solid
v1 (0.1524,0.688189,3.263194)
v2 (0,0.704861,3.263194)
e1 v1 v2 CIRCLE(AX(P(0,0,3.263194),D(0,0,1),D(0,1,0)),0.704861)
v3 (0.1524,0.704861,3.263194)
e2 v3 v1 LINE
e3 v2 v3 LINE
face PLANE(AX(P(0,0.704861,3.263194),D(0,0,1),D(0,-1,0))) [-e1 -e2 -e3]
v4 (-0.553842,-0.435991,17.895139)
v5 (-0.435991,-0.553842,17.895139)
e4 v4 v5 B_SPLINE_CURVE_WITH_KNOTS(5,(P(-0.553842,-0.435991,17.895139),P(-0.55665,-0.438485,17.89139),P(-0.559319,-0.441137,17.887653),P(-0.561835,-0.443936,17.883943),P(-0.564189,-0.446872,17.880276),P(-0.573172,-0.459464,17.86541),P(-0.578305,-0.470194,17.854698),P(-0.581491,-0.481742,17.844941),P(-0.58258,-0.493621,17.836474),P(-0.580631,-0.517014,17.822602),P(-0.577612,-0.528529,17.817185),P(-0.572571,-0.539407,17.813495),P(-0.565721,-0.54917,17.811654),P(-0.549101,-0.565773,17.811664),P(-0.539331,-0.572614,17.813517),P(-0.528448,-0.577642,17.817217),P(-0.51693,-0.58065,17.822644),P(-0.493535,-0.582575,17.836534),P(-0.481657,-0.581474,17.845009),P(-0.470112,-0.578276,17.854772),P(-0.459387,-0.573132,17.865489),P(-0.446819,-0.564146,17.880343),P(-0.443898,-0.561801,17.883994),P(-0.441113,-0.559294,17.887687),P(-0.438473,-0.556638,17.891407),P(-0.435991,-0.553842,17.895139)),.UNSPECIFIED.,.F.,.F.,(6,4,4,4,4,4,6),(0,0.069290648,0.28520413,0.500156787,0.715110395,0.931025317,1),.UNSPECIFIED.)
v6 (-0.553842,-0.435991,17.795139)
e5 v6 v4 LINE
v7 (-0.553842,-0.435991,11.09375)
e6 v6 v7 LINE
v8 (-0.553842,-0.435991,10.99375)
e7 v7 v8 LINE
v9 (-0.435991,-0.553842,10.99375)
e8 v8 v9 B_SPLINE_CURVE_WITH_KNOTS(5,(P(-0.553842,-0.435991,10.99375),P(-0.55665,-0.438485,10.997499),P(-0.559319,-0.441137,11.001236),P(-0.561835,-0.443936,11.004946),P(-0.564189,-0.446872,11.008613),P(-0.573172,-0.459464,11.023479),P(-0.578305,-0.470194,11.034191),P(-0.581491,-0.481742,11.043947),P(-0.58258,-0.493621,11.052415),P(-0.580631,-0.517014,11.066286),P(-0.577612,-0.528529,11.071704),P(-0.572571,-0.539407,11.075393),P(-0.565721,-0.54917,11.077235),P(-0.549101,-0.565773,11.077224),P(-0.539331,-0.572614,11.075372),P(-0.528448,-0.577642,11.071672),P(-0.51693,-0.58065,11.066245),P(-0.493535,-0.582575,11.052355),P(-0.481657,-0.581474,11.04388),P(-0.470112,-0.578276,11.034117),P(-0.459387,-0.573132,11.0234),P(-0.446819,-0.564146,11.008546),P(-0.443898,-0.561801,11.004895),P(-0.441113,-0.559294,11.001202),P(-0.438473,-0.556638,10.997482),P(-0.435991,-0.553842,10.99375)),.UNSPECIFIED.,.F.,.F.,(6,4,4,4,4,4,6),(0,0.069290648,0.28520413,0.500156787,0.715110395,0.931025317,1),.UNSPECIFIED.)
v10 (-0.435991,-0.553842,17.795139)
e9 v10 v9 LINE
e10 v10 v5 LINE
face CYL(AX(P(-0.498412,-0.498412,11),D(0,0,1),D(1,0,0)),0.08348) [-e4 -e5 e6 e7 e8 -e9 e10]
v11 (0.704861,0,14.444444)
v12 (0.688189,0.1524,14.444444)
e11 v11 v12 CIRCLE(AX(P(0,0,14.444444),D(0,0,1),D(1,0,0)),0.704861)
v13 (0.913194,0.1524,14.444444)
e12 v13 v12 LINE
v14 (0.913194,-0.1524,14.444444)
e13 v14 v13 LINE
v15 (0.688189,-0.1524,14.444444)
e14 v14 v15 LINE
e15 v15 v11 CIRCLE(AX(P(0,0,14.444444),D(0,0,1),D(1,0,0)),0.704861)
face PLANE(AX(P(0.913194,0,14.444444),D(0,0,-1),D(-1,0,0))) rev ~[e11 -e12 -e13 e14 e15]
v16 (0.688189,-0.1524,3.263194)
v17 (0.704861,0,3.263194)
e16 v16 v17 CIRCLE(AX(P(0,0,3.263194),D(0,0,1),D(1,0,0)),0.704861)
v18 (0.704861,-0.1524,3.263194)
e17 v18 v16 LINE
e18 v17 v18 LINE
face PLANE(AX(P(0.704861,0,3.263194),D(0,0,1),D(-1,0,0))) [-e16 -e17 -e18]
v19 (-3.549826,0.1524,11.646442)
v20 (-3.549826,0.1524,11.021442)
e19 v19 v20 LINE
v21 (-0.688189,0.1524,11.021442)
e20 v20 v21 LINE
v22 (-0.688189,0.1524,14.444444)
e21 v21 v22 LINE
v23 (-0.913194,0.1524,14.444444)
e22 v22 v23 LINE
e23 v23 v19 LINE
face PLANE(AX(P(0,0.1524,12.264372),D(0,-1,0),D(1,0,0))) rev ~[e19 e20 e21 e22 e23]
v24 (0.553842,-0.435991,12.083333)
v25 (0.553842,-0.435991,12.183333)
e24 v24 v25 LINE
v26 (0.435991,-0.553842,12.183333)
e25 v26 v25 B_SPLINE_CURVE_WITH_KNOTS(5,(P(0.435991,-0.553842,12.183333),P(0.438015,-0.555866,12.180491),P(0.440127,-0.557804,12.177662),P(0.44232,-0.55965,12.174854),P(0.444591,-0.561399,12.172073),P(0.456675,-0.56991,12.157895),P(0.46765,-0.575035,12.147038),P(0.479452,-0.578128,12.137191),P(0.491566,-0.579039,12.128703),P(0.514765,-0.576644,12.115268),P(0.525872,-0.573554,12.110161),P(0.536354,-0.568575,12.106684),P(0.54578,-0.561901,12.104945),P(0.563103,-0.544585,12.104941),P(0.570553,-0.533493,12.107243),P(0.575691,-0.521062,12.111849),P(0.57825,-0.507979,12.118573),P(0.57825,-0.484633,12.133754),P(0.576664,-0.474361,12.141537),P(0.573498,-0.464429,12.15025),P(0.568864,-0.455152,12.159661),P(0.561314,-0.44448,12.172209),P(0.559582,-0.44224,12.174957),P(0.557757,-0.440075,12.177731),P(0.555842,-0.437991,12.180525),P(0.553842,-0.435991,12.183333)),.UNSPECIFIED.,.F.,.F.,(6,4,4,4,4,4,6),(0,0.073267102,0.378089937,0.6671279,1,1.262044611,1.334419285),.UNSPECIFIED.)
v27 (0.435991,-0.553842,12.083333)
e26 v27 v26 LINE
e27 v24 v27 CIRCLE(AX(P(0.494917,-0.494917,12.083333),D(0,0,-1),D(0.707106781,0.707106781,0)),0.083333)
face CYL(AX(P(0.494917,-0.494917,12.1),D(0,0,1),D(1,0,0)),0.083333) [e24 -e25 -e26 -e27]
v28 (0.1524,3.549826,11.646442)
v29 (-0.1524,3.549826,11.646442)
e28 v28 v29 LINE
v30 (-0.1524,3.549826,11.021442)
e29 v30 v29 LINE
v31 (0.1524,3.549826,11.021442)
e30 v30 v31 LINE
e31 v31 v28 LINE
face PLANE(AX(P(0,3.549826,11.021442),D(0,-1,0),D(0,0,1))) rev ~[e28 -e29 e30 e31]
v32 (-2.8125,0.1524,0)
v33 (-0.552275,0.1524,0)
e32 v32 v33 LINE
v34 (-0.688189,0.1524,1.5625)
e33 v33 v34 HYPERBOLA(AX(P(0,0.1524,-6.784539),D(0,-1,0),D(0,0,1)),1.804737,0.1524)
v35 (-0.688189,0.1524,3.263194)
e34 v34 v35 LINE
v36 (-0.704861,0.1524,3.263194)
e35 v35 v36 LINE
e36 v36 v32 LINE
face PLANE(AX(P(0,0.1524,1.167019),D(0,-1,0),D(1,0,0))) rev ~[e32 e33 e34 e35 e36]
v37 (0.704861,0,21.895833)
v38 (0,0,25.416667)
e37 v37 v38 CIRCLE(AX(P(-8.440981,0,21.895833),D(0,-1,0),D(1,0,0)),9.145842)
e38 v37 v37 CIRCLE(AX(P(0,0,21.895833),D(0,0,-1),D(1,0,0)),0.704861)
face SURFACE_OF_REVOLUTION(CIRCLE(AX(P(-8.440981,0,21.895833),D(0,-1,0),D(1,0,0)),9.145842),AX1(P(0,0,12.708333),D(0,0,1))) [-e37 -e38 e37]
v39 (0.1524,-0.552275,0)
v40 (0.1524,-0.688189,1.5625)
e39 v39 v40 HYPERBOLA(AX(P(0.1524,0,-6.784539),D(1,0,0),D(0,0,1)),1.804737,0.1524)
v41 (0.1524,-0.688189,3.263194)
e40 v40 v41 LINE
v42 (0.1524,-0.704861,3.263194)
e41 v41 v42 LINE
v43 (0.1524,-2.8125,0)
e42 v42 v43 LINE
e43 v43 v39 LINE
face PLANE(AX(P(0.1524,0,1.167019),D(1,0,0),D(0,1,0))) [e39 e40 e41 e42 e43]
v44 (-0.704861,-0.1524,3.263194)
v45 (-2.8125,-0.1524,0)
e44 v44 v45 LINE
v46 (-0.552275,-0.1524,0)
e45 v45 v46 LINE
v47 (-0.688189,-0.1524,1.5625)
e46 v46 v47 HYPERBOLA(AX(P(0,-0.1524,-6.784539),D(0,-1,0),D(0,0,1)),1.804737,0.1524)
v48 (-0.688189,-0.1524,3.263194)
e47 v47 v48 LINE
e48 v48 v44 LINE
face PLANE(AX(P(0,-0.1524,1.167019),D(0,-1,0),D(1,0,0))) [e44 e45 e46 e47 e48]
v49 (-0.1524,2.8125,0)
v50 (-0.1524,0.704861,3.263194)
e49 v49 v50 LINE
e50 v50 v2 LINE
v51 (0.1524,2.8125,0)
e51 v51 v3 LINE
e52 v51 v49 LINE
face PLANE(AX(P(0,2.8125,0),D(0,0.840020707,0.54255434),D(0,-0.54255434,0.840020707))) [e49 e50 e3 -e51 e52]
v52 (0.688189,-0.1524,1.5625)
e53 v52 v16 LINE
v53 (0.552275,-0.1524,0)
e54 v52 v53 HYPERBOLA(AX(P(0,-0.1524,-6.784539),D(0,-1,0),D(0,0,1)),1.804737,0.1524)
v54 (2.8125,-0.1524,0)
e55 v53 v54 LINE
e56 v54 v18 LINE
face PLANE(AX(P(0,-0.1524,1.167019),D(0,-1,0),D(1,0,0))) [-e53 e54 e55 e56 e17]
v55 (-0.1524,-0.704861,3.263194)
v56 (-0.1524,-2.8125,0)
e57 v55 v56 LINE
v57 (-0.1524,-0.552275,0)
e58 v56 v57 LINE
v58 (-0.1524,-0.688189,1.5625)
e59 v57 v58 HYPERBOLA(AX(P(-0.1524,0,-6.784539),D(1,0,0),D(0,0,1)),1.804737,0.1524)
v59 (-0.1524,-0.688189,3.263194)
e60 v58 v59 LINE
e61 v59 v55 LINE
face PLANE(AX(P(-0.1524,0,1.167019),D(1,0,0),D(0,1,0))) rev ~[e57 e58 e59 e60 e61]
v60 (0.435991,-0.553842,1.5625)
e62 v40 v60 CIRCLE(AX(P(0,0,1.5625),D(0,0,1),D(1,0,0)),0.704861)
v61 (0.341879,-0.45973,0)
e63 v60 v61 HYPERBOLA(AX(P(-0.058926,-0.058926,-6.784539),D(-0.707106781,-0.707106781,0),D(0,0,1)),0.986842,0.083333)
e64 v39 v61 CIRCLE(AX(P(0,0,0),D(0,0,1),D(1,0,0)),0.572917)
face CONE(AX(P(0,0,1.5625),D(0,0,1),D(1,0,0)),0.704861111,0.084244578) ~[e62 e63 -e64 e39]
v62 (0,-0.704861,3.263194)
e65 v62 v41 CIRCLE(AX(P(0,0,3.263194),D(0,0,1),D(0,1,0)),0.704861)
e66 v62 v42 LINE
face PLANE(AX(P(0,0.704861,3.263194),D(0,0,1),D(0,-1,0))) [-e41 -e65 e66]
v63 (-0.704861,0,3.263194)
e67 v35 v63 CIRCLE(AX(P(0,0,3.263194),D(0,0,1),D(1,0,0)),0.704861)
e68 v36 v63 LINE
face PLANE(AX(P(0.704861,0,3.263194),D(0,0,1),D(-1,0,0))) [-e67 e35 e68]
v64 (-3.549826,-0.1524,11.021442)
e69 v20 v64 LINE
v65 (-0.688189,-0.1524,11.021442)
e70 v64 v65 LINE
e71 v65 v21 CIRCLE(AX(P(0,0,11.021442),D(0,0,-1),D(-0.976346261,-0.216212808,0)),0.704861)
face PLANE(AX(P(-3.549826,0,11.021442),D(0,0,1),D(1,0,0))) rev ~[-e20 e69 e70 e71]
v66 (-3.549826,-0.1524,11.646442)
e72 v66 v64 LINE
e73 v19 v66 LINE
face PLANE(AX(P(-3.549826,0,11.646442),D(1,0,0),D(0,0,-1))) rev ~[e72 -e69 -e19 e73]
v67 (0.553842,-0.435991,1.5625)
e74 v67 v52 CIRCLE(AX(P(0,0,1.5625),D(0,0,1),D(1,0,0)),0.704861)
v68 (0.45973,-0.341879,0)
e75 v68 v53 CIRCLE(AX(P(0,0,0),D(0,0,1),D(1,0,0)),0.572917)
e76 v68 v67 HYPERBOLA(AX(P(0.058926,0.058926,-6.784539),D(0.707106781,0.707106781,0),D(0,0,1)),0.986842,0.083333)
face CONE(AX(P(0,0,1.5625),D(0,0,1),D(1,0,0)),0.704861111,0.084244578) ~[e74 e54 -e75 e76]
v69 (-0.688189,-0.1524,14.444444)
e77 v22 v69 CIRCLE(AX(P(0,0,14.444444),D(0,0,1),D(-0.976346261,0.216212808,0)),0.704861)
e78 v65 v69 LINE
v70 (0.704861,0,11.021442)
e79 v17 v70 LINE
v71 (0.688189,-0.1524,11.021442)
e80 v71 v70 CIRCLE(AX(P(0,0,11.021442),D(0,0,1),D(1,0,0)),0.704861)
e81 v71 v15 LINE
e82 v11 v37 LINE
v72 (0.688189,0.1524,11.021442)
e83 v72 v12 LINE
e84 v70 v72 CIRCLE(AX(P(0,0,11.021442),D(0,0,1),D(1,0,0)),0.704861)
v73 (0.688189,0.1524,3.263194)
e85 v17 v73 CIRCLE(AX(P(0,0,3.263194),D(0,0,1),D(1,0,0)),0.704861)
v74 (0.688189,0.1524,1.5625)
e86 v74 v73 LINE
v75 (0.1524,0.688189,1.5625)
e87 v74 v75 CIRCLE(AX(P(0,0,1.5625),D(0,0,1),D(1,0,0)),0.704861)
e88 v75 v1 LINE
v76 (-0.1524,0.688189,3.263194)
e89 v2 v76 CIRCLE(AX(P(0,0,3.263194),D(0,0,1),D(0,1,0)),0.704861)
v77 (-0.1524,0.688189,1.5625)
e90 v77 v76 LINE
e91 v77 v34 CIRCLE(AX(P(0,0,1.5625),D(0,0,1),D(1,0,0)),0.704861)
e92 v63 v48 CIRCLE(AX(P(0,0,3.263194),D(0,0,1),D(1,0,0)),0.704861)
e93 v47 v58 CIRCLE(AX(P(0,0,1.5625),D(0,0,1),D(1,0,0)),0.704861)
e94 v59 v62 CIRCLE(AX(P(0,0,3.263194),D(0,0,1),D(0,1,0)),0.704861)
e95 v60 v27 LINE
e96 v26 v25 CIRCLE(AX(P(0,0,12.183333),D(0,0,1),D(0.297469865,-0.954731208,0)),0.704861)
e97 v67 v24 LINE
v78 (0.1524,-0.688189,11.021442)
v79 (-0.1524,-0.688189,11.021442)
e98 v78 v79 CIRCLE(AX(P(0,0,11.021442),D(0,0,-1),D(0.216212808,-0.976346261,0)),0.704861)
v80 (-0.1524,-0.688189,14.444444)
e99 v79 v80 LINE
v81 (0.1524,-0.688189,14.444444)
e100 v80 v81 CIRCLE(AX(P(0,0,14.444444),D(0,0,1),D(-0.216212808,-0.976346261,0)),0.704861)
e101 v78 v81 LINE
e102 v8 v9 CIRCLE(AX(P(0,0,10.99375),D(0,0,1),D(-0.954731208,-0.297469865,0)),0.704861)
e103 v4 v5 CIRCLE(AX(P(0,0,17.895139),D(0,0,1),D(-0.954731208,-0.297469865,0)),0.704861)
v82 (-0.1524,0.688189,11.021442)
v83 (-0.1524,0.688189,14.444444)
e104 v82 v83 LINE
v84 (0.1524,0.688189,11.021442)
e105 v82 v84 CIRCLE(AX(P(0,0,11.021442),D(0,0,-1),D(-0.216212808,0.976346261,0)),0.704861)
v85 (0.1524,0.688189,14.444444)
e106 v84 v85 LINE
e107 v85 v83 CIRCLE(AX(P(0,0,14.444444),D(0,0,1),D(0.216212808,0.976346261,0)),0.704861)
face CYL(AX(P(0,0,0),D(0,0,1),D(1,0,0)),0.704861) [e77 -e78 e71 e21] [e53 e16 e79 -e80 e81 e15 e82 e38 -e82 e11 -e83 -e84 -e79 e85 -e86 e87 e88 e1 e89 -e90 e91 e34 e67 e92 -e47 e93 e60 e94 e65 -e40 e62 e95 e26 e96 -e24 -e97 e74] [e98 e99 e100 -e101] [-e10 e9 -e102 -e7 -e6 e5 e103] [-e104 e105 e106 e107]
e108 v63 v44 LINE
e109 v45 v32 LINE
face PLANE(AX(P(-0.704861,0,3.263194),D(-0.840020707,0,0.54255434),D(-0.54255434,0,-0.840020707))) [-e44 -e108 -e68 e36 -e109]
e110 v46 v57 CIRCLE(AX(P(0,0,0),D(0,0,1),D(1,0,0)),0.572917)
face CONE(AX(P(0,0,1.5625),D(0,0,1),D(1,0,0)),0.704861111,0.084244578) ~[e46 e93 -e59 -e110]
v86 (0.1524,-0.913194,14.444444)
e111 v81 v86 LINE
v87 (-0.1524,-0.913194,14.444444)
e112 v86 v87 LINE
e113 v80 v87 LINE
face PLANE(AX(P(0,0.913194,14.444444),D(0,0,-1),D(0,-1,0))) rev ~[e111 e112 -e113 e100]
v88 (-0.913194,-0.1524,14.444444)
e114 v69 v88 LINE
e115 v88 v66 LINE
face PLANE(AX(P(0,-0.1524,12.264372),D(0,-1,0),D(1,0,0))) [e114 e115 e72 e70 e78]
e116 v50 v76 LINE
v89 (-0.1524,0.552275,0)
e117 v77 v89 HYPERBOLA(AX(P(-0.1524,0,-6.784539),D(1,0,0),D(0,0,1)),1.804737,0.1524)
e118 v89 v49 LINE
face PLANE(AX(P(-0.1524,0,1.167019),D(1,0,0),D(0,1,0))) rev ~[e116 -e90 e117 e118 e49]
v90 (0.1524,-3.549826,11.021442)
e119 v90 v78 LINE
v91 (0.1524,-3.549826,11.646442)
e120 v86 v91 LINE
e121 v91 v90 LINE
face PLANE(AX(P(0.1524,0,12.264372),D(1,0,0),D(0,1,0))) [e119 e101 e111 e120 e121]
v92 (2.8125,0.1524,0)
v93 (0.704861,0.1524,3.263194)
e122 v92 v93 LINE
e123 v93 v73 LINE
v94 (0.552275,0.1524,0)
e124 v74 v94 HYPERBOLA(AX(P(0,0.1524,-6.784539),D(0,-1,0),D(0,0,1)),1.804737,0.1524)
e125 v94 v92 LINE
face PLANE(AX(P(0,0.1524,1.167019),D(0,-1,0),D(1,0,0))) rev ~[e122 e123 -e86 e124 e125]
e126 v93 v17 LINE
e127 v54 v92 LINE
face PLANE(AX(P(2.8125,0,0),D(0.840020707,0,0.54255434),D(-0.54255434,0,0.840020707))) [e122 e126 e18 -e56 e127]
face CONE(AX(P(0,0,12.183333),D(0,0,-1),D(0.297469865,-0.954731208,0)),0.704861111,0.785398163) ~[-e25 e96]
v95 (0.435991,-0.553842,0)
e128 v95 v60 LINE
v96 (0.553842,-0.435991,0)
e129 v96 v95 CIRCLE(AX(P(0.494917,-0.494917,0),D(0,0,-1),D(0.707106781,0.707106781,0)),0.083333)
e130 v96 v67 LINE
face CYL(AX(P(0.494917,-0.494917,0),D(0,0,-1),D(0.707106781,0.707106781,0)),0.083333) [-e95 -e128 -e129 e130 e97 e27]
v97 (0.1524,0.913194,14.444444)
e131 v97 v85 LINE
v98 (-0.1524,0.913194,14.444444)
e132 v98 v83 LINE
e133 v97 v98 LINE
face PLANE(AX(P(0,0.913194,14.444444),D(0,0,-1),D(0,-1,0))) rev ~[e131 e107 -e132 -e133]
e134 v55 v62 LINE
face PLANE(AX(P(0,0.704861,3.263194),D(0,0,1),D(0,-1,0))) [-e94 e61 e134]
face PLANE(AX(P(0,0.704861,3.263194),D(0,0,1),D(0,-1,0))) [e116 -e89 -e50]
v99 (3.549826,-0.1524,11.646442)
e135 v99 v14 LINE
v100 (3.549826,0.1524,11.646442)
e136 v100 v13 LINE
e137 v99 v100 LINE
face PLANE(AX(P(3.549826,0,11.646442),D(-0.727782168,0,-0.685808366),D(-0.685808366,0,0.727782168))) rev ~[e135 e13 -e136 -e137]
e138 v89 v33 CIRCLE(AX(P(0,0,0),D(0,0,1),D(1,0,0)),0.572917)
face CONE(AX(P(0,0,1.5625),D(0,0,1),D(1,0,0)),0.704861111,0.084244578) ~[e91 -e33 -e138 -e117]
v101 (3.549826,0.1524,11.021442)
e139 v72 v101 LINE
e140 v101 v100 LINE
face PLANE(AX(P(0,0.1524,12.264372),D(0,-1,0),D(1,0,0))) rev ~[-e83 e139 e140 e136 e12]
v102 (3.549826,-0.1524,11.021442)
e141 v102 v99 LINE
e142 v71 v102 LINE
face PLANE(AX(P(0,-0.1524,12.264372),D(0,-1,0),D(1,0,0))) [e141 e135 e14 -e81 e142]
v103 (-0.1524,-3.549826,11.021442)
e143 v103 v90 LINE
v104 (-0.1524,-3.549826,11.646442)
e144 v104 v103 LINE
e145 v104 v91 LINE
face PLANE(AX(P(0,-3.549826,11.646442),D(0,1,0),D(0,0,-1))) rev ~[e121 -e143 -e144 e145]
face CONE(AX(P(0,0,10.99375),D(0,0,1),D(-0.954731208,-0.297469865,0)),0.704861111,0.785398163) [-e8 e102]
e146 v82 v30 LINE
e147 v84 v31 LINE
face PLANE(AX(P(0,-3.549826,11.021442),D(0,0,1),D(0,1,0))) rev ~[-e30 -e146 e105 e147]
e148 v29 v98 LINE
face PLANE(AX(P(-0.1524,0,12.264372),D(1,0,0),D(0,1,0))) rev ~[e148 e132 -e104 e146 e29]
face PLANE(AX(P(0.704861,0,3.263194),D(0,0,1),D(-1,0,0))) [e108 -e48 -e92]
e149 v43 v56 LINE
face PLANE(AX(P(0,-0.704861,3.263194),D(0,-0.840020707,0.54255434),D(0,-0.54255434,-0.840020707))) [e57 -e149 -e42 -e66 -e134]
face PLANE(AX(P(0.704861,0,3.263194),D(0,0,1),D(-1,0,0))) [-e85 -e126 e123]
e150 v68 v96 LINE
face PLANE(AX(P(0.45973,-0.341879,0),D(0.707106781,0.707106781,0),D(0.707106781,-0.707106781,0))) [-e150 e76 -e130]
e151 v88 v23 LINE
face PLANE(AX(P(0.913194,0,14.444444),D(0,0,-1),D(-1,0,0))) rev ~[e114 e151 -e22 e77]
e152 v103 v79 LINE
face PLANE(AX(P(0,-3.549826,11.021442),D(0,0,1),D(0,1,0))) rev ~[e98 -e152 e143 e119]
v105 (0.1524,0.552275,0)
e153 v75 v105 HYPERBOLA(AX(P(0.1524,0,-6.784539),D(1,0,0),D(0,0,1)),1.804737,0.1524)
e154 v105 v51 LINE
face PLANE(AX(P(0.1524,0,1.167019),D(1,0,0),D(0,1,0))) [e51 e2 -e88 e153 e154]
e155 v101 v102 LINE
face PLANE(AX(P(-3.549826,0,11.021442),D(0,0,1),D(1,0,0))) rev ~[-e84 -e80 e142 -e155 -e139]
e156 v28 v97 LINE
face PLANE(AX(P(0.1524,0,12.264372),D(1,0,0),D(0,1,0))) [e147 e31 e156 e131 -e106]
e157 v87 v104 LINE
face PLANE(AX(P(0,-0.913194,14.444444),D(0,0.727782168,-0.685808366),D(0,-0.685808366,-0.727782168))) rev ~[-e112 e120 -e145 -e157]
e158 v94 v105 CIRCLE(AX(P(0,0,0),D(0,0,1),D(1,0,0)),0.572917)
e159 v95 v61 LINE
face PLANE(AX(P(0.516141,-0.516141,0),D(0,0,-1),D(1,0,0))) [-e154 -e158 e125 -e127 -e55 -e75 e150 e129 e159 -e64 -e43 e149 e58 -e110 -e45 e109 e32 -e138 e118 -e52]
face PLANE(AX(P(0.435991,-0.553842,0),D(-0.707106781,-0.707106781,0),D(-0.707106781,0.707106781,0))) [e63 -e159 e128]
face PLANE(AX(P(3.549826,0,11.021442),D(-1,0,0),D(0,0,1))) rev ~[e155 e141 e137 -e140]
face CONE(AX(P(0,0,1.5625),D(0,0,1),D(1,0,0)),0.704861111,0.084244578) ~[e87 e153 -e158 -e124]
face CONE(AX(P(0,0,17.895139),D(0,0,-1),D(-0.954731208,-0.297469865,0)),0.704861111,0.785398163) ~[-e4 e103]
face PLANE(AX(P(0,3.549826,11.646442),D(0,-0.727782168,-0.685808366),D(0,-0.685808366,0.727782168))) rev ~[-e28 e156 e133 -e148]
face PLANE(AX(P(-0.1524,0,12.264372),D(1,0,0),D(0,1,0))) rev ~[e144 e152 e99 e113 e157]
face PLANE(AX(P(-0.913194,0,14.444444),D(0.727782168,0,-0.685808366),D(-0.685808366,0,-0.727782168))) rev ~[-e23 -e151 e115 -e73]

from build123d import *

# Parameters (mm, degrees)
F5_DEPTH      = 0.1524
F6_COUNT      = 4
F8_DEPTH      = 3.3506944444
F10_DEPTH     = 12.0833333333
F11_T4_ANGLE  = 55.3885988596
F11_S5_R      = 0.0834798304
F11_T6_DEPTH  = 2
F11_T10_ANGLE = 55.3885988596
F11_S11_R     = 0.0834798304
F11_T12_DEPTH = 2
F11_T16_ANGLE = 55.3885988596
F11_S17_R     = 0.0833333333
F11_T18_DEPTH = 2


# Not quite as in the source:
# - a fillet or chamfer that OpenCascade refuses, or shapes differently, is made with other operations: its cross-section is extruded or revolved along the edge and cut away or added


with BuildPart() as f1:
    # F0 (on Front) → F1 (revolve)
    with BuildSketch(Plane.XZ):
        with BuildLine():
            Line((0, 25.4166666667), (0, 0))
            Line((0, 0), (0.7048611111, 0))
            Line((0.7048611111, 0), (0.7048611111, 21.8958333333))
            ThreePointArc((0.7048611111, 21.8958333333), (0.5269147233, 23.6911812486), (0, 25.4166666667))
        make_face()
    revolve(axis=Axis((0, 0, 12.7083333333), (0, 0, 1)))

    # F2 (on Front) → F3 (revolve, cut)
    with BuildSketch(Plane.XZ):
        Polygon((0.7048611111, 1.5625), (0.5729166667, 0), (0.7048611111, 0), (1.5729166667, 0), (1.5729166667, 1.5625), align=None)
    revolve(axis=Axis((0, 0, 0), (0, 0, 1)), mode=Mode.SUBTRACT)

    # F4 (on Front) → F5 (join, symmetric)
    with BuildSketch(Plane.XZ):
        Polygon((0.7048611111, 14.4444444444), (-0.7048611111, 14.4444444444), (-0.9131944444, 14.4444444444), (-3.5498263889, 11.6464416667), (-3.5498263889, 11.0214416667), (-0.7048611111, 11.0214416667), (0.7048611111, 11.0214416667), (3.5498263889, 11.0214416667), (3.5498263889, 11.6464416667), (0.9131944444, 14.4444444444), align=None)
        Polygon((2.8125, 0), (0.7048611111, 3.2631944444), (-0.7048611111, 3.2631944444), (-2.8125, 0), (-0.1651, 0), (0.1651, 0), align=None)
    extrude(amount=F5_DEPTH, both=True)

    # F6: F1 ×4 about axis
    f6_axis = Axis((0, 0, 0), (0, 0, 1))


with BuildPart() as f1_1:
    add(f1.part)
    for i in range(1, F6_COUNT):
        add(f1.part.rotate(f6_axis, i * 360 / F6_COUNT))

    # F7 (on face) → F8 (join, symmetric)
    with BuildSketch(Plane.XY.offset(14.4444444444)):
        with BuildLine():
            ThreePointArc((-0.5538420942, -0.435990964), (-0.5574412256, -0.5574412256), (-0.435990964, -0.5538420942))
            ThreePointArc((-0.435990964, -0.5538420942), (-0.4984120715, -0.4984120715), (-0.5538420942, -0.435990964))
        make_face()
        with BuildLine():
            ThreePointArc((-0.5538420942, -0.435990964), (-0.4984120715, -0.4984120715), (-0.435990964, -0.5538420942))
            Line((-0.435990964, -0.5538420942), (-0.3224915619, -0.4403426921))
            Line((-0.3224915619, -0.4403426921), (-0.4403426921, -0.3224915619))
            Line((-0.4403426921, -0.3224915619), (-0.5538420942, -0.435990964))
        make_face()
    extrude(amount=F8_DEPTH, both=True)

    # F9 (on face) → F10 (join)
    with BuildSketch(Plane(origin=(0, 0, 0), x_dir=(1, 0, 0), z_dir=(0, 0, -1))):
        with BuildLine():
            ThreePointArc((0.435990964, 0.5538420942), (0.4984120715, 0.4984120715), (0.5538420942, 0.435990964))
            ThreePointArc((0.5538420942, 0.435990964), (0.5538420942, 0.5538420942), (0.435990964, 0.5538420942))
        make_face()
        with BuildLine():
            ThreePointArc((0.3418792892, 0.4597304194), (0.4051132601, 0.4051132601), (0.4597304194, 0.3418792892))
            Line((0.4597304194, 0.3418792892), (0.5538420942, 0.435990964))
            ThreePointArc((0.5538420942, 0.435990964), (0.4984120715, 0.4984120715), (0.435990964, 0.5538420942))
            Line((0.435990964, 0.5538420942), (0.3418792892, 0.4597304194))
        make_face()
    extrude(amount=-F10_DEPTH)

    # F11: chamfer of 0.1 on 3 edges, made by hand


with BuildPart() as f11_tool2:
    # F11_s3 → F11_t4 (revolve)
    with BuildSketch(Plane(origin=(0, 0, 0), x_dir=(0, 0, 1), z_dir=(-0.2974698653, 0.9547312078, 0))):
        Polygon((17.8951388889, -0.7048611111), (17.7951388889, -0.8048611111), (17.7951388889, -0.7048611111), align=None)
    revolve(axis=Axis((0, 0, 17.7951388889), (0, 0, 1)), revolution_arc=F11_T4_ANGLE)

    # F11_s5 → F11_t6 (intersect, symmetric)
    with BuildSketch(Plane.XY.offset(17.8)):
        with Locations((-0.4984120715, -0.4984120715)):
            Circle(F11_S5_R)
    extrude(amount=F11_T6_DEPTH, both=True, mode=Mode.INTERSECT)


with BuildPart() as f1_2:
    add(f1_1.part)

    # F11_t1: union F11_tool2
    add(f11_tool2.part)


with BuildPart() as f11_tool8:
    # F11_s9 → F11_t10 (revolve)
    with BuildSketch(Plane(origin=(0, 0, 0), x_dir=(0, 0, 1), z_dir=(-0.2974698653, 0.9547312078, 0))):
        Polygon((10.99375, -0.7048611111), (11.09375, -0.8048611111), (11.09375, -0.7048611111), align=None)
    revolve(axis=Axis((0, 0, 11.09375), (0, 0, 1)), revolution_arc=F11_T10_ANGLE)

    # F11_s11 → F11_t12 (intersect, symmetric)
    with BuildSketch(Plane.XY.offset(11)):
        with Locations((-0.4984120715, -0.4984120715)):
            Circle(F11_S11_R)
    extrude(amount=F11_T12_DEPTH, both=True, mode=Mode.INTERSECT)


with BuildPart() as f1_3:
    add(f1_2.part)

    # F11_t7: union F11_tool8
    add(f11_tool8.part)


with BuildPart() as f11_tool14:
    # F11_s15 → F11_t16 (revolve)
    with BuildSketch(Plane(origin=(0, 0, 0), x_dir=(0, 0, 1), z_dir=(-0.9547312078, -0.2974698653, 0))):
        Polygon((12.1833333333, -0.7048611111), (12.0833333333, -0.8048611111), (12.0833333333, -0.7048611111), align=None)
    revolve(axis=Axis((0, 0, 12.0833333333), (0, 0, 1)), revolution_arc=F11_T16_ANGLE)

    # F11_s17 → F11_t18 (intersect, symmetric)
    with BuildSketch(Plane.XY.offset(12.1)):
        with Locations((0.4949165291, -0.4949165291)):
            Circle(F11_S17_R)
    extrude(amount=F11_T18_DEPTH, both=True, mode=Mode.INTERSECT)


with BuildPart() as f1_4:
    add(f1_3.part)

    # F11_t13: union F11_tool14
    add(f11_tool14.part)


solid = f1_4.part
